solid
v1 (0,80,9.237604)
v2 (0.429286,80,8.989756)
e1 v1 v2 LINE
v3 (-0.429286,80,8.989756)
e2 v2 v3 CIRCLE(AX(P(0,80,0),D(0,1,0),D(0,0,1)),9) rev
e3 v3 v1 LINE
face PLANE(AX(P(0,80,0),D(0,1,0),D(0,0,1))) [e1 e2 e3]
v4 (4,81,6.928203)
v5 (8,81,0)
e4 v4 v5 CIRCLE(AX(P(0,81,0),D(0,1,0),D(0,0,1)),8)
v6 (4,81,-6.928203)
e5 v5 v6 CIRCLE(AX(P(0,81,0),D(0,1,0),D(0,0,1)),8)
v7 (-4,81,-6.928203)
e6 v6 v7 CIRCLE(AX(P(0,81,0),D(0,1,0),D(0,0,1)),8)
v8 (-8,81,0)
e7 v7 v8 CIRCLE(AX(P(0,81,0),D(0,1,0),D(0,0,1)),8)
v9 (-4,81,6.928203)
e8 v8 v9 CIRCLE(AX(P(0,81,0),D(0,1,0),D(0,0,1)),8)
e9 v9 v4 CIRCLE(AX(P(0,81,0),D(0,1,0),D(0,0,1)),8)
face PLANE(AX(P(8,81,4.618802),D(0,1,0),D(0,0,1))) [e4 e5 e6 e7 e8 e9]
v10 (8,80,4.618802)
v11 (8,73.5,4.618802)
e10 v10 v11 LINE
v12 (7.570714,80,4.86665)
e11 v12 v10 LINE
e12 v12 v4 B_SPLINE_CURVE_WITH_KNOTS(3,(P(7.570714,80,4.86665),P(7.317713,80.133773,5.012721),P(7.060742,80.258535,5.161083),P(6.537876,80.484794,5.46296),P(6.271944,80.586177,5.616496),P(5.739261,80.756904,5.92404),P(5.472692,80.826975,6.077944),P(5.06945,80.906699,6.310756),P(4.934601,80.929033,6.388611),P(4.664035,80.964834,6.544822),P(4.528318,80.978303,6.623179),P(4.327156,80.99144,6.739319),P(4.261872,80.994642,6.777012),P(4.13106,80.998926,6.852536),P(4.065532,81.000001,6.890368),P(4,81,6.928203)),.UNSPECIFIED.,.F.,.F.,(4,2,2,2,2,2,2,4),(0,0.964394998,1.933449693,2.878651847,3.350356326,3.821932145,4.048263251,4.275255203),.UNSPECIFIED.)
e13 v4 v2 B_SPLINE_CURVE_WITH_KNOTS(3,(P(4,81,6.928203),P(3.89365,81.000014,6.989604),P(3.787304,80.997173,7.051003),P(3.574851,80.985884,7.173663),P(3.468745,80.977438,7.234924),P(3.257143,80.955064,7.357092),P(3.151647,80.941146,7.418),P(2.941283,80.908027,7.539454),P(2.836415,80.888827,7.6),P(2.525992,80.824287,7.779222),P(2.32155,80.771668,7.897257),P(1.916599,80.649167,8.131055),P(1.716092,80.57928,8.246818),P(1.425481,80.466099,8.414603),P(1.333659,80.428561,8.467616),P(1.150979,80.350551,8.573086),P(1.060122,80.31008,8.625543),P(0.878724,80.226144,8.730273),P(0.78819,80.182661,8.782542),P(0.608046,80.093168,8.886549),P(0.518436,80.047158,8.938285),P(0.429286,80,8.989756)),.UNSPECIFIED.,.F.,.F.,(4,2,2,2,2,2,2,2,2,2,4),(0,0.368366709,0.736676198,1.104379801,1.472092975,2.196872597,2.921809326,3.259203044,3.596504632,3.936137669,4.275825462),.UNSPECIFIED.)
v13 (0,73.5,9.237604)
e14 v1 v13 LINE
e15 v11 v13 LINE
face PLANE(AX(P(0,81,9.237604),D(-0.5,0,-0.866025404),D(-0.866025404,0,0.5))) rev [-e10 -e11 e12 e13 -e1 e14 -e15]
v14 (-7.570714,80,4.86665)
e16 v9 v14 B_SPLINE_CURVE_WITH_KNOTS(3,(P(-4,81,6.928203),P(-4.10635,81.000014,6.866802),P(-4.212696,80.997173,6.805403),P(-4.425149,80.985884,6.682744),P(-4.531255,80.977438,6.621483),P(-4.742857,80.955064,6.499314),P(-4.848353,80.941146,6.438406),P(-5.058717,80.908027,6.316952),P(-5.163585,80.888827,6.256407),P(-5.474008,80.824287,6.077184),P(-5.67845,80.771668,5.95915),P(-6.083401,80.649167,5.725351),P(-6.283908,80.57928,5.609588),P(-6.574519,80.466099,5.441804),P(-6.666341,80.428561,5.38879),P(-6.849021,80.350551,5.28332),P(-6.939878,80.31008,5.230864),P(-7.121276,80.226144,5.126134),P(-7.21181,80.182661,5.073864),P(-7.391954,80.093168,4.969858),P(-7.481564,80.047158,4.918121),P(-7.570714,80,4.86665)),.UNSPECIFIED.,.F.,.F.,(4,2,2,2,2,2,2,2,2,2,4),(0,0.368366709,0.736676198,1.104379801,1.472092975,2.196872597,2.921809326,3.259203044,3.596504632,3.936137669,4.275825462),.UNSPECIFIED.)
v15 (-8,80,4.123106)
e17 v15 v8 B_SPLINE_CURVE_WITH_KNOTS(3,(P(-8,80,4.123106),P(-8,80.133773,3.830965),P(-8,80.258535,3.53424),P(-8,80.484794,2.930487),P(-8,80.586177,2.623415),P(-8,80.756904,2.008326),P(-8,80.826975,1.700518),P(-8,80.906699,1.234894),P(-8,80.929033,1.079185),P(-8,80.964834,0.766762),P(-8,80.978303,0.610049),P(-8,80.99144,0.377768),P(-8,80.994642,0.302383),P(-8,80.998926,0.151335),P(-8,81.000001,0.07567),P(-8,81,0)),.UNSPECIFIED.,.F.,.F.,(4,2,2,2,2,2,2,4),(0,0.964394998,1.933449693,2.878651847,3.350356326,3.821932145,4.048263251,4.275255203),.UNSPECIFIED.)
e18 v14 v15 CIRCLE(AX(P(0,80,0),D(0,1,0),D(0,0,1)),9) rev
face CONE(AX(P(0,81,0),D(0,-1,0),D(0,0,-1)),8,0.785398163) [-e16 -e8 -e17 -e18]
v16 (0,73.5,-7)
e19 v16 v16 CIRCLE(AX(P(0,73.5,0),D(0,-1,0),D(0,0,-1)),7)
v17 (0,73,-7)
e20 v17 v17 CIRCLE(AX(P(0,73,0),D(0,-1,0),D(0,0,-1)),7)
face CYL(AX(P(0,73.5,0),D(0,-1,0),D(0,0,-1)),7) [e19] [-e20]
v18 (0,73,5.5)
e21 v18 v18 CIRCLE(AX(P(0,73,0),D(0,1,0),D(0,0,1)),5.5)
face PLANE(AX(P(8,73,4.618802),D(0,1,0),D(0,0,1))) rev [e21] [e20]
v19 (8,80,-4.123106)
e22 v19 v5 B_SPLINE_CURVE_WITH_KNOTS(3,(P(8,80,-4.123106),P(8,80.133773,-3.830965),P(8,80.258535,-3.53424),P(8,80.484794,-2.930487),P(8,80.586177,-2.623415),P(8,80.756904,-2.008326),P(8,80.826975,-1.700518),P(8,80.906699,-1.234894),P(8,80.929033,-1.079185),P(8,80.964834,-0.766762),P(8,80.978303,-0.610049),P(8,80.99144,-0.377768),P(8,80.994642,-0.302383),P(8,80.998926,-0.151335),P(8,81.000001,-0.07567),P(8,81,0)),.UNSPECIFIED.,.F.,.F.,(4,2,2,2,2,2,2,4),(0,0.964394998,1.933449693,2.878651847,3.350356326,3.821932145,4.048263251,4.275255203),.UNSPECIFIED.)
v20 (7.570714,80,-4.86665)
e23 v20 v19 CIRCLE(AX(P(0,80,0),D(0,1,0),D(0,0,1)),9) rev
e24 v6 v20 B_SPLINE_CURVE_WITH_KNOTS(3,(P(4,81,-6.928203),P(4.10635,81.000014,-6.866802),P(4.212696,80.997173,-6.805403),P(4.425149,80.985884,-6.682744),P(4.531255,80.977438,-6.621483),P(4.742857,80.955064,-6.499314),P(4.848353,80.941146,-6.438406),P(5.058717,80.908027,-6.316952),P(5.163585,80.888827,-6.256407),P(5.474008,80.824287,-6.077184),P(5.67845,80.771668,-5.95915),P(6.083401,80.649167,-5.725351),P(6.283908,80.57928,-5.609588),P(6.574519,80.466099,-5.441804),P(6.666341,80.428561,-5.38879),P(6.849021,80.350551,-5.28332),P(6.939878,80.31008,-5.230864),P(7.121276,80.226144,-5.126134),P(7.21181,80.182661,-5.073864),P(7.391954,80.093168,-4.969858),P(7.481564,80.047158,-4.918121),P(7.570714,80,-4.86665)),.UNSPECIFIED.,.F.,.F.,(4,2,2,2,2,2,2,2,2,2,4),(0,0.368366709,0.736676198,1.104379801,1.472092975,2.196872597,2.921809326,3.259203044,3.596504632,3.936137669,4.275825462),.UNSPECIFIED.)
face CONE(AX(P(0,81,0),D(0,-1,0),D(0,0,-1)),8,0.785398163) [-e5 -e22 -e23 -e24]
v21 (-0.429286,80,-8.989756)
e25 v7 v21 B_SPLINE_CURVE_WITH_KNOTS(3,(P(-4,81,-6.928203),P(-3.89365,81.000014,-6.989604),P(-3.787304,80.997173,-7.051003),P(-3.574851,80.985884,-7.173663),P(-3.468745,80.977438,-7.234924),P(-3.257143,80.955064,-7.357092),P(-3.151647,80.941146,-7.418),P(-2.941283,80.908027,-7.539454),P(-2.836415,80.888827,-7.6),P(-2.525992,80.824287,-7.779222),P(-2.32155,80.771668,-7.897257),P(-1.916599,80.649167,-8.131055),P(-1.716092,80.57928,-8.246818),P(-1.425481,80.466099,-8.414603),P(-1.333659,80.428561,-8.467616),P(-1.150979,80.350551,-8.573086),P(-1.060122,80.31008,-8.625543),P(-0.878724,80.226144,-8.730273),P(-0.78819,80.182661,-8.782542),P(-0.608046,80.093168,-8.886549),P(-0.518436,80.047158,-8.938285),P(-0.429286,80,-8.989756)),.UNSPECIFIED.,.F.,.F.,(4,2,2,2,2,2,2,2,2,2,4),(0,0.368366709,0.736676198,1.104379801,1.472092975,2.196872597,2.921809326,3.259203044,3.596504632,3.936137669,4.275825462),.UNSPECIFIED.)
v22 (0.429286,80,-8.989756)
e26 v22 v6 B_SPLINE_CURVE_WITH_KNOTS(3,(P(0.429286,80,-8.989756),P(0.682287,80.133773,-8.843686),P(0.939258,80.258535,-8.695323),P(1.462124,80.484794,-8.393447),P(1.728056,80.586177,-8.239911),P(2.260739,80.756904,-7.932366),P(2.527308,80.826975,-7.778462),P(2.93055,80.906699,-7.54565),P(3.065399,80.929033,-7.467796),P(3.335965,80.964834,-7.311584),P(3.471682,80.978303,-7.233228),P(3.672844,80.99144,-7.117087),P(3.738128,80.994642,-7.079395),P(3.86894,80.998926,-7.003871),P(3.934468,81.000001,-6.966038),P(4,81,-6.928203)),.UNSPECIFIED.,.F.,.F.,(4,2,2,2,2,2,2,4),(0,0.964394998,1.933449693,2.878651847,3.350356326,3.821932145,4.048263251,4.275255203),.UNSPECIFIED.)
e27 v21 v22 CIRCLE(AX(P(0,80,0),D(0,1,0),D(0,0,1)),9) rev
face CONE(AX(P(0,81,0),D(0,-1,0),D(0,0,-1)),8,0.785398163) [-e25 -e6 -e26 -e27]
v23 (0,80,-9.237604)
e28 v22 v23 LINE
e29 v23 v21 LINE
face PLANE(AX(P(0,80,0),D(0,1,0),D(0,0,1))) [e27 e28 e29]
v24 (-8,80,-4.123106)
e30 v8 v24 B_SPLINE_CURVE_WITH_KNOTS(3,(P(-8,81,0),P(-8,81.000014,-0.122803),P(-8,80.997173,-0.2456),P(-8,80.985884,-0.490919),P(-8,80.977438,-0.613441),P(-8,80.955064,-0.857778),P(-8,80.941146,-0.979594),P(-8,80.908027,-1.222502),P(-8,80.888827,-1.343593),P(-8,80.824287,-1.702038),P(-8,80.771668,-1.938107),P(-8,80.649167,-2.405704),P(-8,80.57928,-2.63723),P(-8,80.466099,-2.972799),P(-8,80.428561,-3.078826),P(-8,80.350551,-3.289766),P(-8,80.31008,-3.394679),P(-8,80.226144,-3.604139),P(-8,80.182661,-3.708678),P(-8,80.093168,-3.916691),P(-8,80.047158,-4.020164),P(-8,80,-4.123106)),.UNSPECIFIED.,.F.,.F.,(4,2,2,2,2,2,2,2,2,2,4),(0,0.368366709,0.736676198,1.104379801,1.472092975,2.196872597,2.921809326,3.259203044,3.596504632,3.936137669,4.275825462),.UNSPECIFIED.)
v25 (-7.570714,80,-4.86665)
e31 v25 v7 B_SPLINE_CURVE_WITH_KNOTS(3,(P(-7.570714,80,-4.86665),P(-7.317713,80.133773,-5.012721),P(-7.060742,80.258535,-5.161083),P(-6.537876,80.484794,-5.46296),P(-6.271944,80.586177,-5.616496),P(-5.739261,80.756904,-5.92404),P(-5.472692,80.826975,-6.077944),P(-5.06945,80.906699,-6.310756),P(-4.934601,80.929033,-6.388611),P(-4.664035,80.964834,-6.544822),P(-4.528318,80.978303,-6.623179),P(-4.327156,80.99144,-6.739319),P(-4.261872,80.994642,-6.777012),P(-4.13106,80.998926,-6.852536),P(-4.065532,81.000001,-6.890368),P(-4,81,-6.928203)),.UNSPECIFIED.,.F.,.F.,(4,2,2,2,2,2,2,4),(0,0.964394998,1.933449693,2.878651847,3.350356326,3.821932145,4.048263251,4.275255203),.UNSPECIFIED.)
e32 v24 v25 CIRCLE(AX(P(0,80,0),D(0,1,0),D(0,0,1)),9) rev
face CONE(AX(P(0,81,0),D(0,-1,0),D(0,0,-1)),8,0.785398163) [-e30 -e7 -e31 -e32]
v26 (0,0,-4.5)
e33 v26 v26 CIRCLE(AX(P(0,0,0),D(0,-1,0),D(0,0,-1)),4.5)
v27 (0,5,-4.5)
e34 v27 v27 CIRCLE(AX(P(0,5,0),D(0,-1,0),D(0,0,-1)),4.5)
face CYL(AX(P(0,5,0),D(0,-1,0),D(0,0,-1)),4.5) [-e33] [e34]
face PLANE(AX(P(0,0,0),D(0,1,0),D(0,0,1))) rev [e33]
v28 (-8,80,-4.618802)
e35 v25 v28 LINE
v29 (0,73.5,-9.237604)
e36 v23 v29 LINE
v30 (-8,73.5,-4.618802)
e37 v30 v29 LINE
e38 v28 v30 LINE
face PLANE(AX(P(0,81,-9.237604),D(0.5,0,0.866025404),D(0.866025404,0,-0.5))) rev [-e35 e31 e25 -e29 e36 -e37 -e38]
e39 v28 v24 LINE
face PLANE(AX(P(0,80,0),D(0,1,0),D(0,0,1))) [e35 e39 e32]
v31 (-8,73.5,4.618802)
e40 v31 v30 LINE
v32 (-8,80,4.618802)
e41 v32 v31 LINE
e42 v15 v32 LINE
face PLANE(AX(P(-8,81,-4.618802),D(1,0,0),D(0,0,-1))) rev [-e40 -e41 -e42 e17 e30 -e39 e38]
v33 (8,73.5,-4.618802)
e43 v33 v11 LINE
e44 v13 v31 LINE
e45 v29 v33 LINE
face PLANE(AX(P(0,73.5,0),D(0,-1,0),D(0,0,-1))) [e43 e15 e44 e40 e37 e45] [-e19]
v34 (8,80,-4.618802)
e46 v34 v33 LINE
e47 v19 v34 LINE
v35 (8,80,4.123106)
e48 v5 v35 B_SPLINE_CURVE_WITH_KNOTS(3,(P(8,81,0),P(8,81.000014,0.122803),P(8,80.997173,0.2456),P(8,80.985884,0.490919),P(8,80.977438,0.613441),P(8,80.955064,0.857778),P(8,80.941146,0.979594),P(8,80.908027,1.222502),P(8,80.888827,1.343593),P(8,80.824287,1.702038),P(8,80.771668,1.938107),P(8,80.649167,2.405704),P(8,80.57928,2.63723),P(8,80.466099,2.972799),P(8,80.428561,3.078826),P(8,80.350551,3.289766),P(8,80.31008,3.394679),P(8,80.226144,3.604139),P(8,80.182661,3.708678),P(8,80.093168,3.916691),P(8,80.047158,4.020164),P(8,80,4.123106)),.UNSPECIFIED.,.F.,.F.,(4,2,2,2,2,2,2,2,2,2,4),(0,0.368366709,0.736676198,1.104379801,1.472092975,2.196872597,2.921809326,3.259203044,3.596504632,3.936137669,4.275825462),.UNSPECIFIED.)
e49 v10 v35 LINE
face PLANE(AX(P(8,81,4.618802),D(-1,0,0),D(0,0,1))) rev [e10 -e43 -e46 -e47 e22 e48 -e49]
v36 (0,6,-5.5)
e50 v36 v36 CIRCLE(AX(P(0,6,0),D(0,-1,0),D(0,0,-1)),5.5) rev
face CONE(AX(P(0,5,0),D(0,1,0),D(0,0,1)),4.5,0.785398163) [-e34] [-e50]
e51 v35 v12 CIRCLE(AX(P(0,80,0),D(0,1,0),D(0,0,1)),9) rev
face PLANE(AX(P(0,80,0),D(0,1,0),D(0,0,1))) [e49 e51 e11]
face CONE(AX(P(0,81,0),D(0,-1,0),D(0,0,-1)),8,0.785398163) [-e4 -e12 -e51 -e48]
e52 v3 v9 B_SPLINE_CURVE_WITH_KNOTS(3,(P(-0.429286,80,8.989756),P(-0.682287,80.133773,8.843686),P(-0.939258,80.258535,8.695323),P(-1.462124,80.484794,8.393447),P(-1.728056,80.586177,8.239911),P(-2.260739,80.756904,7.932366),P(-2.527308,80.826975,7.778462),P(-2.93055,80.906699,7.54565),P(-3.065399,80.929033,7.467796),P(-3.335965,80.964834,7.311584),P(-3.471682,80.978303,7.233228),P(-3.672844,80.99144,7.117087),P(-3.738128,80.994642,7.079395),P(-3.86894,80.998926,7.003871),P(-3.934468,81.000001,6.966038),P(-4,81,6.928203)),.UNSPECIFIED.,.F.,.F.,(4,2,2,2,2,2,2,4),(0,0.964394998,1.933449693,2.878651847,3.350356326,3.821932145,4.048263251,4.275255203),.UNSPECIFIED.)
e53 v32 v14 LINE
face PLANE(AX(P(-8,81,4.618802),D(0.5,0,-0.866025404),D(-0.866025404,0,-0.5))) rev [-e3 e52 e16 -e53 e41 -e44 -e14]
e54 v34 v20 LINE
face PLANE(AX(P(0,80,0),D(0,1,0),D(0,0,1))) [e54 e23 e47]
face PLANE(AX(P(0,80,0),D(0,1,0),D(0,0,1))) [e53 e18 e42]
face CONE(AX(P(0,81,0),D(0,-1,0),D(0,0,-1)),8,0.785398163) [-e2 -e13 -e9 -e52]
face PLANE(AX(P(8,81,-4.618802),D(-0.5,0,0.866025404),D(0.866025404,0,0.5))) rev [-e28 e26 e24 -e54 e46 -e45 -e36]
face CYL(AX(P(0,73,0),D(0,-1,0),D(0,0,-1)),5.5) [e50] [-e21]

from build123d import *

# Parameters (mm, degrees)
SKETCH1_R      = 5.5
EXTRUDE1_DEPTH = 73
EXTRUDE2_DEPTH = 8
SKETCH3_R      = 14.116748978
SKETCH3_R_2    = 7
EXTRUDE3_DEPTH = 0.5
SKETCH4_R      = 19.693652211
SKETCH4_R_2    = 4.5
EXTRUDE4_DEPTH = 5
CHAMFER1_SIZE  = 1
SKETCH5_R      = 25.58893004
SKETCH5_R_2    = 8
EXTRUDE5_DEPTH = 1
CHAMFER2_SIZE  = 1


# Some blends are built 0.0001 mm under size
with BuildPart() as part:
    # Sketch1 → Extrude1 (new body)
    with BuildSketch(Plane(origin=(0, 0, 0), x_dir=(1, 0, 0), z_dir=(0, 1, 0))):
        with Locations(Location((0, 0, 0), (0, 0, 270))):
            Circle(SKETCH1_R)
    extrude(amount=EXTRUDE1_DEPTH)

    # Sketch2 → Extrude2 (add)
    with BuildSketch(Plane(origin=(0, 73, 0), x_dir=(1, 0, 0), z_dir=(0, 1, 0))):
        Polygon((8, -4.618802154), (8, 4.618802154), (0, 9.237604307), (-8, 4.618802154), (-8, -4.618802154), (0, -9.237604307), align=None)
    extrude(amount=EXTRUDE2_DEPTH)

    # Sketch3 → Extrude3 (cut)
    with BuildSketch(Plane.XZ.offset(-73)):
        Circle(SKETCH3_R)
        with Locations(Location((0, 0, 0), (0, 0, 270))):
            Circle(SKETCH3_R_2, mode=Mode.SUBTRACT)
    extrude(amount=-EXTRUDE3_DEPTH, mode=Mode.SUBTRACT)

    # Sketch4 → Extrude4 (cut)
    with BuildSketch(Plane.XZ):
        Circle(SKETCH4_R)
        with Locations(Location((0, 0, 0), (0, 0, 270))):
            Circle(SKETCH4_R_2, mode=Mode.SUBTRACT)
    extrude(amount=-EXTRUDE4_DEPTH, mode=Mode.SUBTRACT)

    # Chamfer1
    chamfer1_edges = [part.edges().sort_by_distance(p)[0] for p in [
        (0, 5, -5.5),
    ]]
    chamfer(chamfer1_edges, length=CHAMFER1_SIZE - 0.0001)  # a hair under: the kernel refuses the full size

    # Sketch5 → Extrude5 (cut)
    with BuildSketch(Plane(origin=(0, 81, 0), x_dir=(1, 0, 0), z_dir=(0, 1, 0))):
        Circle(SKETCH5_R)
        with Locations(Location((0, 0, 0), (0, 0, 270))):
            Circle(SKETCH5_R_2, mode=Mode.SUBTRACT)
    extrude(amount=-EXTRUDE5_DEPTH, mode=Mode.SUBTRACT)

    # Chamfer2
    # the kernel refuses this chamfer: 1 mm, written as the material it adds along each edge
    with BuildSketch(Plane(origin=(0, 80, 0), x_dir=(0.5000000000000043, 0, -0.8660254037844362), z_dir=(0.8660254037844362, 0, 0.5000000000000043))) as chamfer2_piece_1_section:
        Polygon((8, CHAMFER2_SIZE), (8 + CHAMFER2_SIZE, 0), (8, 0), align=None)
    chamfer2_piece_1 = revolve(axis=Axis((0, 80, 0), (0, 1, 0)), revolution_arc=60, mode=Mode.PRIVATE)
    chamfer2_piece_1 = split(chamfer2_piece_1, bisect_by=Plane(origin=(-0.488712857, 80.376891688, -8.955445807), z_dir=(0.49999999999999606, 0, 0.8660254037844412)), keep=Keep.TOP, mode=Mode.PRIVATE)
    chamfer2_piece_1 = split(chamfer2_piece_1, bisect_by=Plane(origin=(0.488712857, 80.376891688, -8.955445807), z_dir=(-0.500000000000004, 0, 0.8660254037844364)), keep=Keep.TOP, mode=Mode.PRIVATE)
    add(chamfer2_piece_1)
    with BuildSketch(Plane(origin=(0, 80, 0), x_dir=(-0.4999999999999957, 0, -0.8660254037844412), z_dir=(0.8660254037844412, 0, -0.4999999999999957))) as chamfer2_piece_2_section:
        Polygon((8, CHAMFER2_SIZE), (8 + CHAMFER2_SIZE, 0), (8, 0), align=None)
    chamfer2_piece_2 = revolve(axis=Axis((0, 80, 0), (0, 1, 0)), revolution_arc=60, mode=Mode.PRIVATE)
    chamfer2_piece_2 = split(chamfer2_piece_2, bisect_by=Plane(origin=(-8, 80.376891688, -4.054485154), z_dir=(1, 0, 0)), keep=Keep.TOP, mode=Mode.PRIVATE)
    chamfer2_piece_2 = split(chamfer2_piece_2, bisect_by=Plane(origin=(-7.511287143, 80.376891688, -4.900960653), z_dir=(0.49999999999999606, 0, 0.8660254037844412)), keep=Keep.TOP, mode=Mode.PRIVATE)
    add(chamfer2_piece_2)
    with BuildSketch(Plane(origin=(0, 80, 0), x_dir=(-1, 0, 0), z_dir=(0, 0, -1))) as chamfer2_piece_3_section:
        Polygon((8, CHAMFER2_SIZE), (8 + CHAMFER2_SIZE, 0), (8, 0), align=None)
    chamfer2_piece_3 = revolve(axis=Axis((0, 80, 0), (0, 1, 0)), revolution_arc=60, mode=Mode.PRIVATE)
    chamfer2_piece_3 = split(chamfer2_piece_3, bisect_by=Plane(origin=(-7.511287143, 80.376891688, 4.900960653), z_dir=(0.5000000000000039, 0, -0.8660254037844365)), keep=Keep.TOP, mode=Mode.PRIVATE)
    chamfer2_piece_3 = split(chamfer2_piece_3, bisect_by=Plane(origin=(-8, 80.376891688, 4.054485154), z_dir=(1, 0, 0)), keep=Keep.TOP, mode=Mode.PRIVATE)
    add(chamfer2_piece_3)
    with BuildSketch(Plane(origin=(0, 80, 0), x_dir=(1, 0, 0), z_dir=(0, 0, 1))) as chamfer2_piece_4_section:
        Polygon((8, CHAMFER2_SIZE), (8 + CHAMFER2_SIZE, 0), (8, 0), align=None)
    chamfer2_piece_4 = revolve(axis=Axis((0, 80, 0), (0, 1, 0)), revolution_arc=60, mode=Mode.PRIVATE)
    chamfer2_piece_4 = split(chamfer2_piece_4, bisect_by=Plane(origin=(8, 80.376891688, -4.054485154), z_dir=(-1, 0, 0)), keep=Keep.TOP, mode=Mode.PRIVATE)
    chamfer2_piece_4 = split(chamfer2_piece_4, bisect_by=Plane(origin=(7.511287143, 80.376891688, -4.900960653), z_dir=(-0.500000000000004, 0, 0.8660254037844364)), keep=Keep.TOP, mode=Mode.PRIVATE)
    add(chamfer2_piece_4)
    with BuildSketch(Plane(origin=(0, 80, 0), x_dir=(-0.5000000000000046, 0, 0.8660254037844362), z_dir=(-0.8660254037844362, 0, -0.5000000000000046))) as chamfer2_piece_5_section:
        Polygon((8, CHAMFER2_SIZE), (8 + CHAMFER2_SIZE, 0), (8, 0), align=None)
    chamfer2_piece_5 = revolve(axis=Axis((0, 80, 0), (0, 1, 0)), revolution_arc=30, mode=Mode.PRIVATE)
    chamfer2_piece_5 = split(chamfer2_piece_5, bisect_by=Plane(origin=(-1.40811023, 80.376891688, 8.424631487), z_dir=(0.5000000000000039, 0, -0.8660254037844365)), keep=Keep.TOP, mode=Mode.PRIVATE)
    add(chamfer2_piece_5)
    with BuildSketch(Plane(origin=(0, 80, 0), x_dir=(0.4999999999999962, 0, 0.8660254037844408), z_dir=(-0.8660254037844408, 0, 0.4999999999999962))) as chamfer2_piece_6_section:
        Polygon((8 + CHAMFER2_SIZE, 0), (8, CHAMFER2_SIZE), (8, 0), align=None)
    chamfer2_piece_6 = revolve(axis=Axis((0, 80, 0), (0, 1, 0)), revolution_arc=60, mode=Mode.PRIVATE)
    chamfer2_piece_6 = split(chamfer2_piece_6, bisect_by=Plane(origin=(8, 80.376891688, 4.054485154), z_dir=(-1, 0, 0)), keep=Keep.TOP, mode=Mode.PRIVATE)
    chamfer2_piece_6 = split(chamfer2_piece_6, bisect_by=Plane(origin=(7.511287143, 80.376891688, 4.900960653), z_dir=(-0.4999999999999963, 0, -0.866025403784441)), keep=Keep.TOP, mode=Mode.PRIVATE)
    add(chamfer2_piece_6)
    with BuildSketch(Plane(origin=(0, 80, 0), x_dir=(0, 0, 1), z_dir=(-1, 0, 0))) as chamfer2_piece_7_section:
        Polygon((8, CHAMFER2_SIZE), (8 + CHAMFER2_SIZE, 0), (8, 0), align=None)
    chamfer2_piece_7 = revolve(axis=Axis((0, 80, 0), (0, 1, 0)), revolution_arc=30, mode=Mode.PRIVATE)
    chamfer2_piece_7 = split(chamfer2_piece_7, bisect_by=Plane(origin=(1.40811023, 80.376891688, 8.424631487), z_dir=(-0.4999999999999963, 0, -0.866025403784441)), keep=Keep.TOP, mode=Mode.PRIVATE)
    add(chamfer2_piece_7)


solid = part.part
